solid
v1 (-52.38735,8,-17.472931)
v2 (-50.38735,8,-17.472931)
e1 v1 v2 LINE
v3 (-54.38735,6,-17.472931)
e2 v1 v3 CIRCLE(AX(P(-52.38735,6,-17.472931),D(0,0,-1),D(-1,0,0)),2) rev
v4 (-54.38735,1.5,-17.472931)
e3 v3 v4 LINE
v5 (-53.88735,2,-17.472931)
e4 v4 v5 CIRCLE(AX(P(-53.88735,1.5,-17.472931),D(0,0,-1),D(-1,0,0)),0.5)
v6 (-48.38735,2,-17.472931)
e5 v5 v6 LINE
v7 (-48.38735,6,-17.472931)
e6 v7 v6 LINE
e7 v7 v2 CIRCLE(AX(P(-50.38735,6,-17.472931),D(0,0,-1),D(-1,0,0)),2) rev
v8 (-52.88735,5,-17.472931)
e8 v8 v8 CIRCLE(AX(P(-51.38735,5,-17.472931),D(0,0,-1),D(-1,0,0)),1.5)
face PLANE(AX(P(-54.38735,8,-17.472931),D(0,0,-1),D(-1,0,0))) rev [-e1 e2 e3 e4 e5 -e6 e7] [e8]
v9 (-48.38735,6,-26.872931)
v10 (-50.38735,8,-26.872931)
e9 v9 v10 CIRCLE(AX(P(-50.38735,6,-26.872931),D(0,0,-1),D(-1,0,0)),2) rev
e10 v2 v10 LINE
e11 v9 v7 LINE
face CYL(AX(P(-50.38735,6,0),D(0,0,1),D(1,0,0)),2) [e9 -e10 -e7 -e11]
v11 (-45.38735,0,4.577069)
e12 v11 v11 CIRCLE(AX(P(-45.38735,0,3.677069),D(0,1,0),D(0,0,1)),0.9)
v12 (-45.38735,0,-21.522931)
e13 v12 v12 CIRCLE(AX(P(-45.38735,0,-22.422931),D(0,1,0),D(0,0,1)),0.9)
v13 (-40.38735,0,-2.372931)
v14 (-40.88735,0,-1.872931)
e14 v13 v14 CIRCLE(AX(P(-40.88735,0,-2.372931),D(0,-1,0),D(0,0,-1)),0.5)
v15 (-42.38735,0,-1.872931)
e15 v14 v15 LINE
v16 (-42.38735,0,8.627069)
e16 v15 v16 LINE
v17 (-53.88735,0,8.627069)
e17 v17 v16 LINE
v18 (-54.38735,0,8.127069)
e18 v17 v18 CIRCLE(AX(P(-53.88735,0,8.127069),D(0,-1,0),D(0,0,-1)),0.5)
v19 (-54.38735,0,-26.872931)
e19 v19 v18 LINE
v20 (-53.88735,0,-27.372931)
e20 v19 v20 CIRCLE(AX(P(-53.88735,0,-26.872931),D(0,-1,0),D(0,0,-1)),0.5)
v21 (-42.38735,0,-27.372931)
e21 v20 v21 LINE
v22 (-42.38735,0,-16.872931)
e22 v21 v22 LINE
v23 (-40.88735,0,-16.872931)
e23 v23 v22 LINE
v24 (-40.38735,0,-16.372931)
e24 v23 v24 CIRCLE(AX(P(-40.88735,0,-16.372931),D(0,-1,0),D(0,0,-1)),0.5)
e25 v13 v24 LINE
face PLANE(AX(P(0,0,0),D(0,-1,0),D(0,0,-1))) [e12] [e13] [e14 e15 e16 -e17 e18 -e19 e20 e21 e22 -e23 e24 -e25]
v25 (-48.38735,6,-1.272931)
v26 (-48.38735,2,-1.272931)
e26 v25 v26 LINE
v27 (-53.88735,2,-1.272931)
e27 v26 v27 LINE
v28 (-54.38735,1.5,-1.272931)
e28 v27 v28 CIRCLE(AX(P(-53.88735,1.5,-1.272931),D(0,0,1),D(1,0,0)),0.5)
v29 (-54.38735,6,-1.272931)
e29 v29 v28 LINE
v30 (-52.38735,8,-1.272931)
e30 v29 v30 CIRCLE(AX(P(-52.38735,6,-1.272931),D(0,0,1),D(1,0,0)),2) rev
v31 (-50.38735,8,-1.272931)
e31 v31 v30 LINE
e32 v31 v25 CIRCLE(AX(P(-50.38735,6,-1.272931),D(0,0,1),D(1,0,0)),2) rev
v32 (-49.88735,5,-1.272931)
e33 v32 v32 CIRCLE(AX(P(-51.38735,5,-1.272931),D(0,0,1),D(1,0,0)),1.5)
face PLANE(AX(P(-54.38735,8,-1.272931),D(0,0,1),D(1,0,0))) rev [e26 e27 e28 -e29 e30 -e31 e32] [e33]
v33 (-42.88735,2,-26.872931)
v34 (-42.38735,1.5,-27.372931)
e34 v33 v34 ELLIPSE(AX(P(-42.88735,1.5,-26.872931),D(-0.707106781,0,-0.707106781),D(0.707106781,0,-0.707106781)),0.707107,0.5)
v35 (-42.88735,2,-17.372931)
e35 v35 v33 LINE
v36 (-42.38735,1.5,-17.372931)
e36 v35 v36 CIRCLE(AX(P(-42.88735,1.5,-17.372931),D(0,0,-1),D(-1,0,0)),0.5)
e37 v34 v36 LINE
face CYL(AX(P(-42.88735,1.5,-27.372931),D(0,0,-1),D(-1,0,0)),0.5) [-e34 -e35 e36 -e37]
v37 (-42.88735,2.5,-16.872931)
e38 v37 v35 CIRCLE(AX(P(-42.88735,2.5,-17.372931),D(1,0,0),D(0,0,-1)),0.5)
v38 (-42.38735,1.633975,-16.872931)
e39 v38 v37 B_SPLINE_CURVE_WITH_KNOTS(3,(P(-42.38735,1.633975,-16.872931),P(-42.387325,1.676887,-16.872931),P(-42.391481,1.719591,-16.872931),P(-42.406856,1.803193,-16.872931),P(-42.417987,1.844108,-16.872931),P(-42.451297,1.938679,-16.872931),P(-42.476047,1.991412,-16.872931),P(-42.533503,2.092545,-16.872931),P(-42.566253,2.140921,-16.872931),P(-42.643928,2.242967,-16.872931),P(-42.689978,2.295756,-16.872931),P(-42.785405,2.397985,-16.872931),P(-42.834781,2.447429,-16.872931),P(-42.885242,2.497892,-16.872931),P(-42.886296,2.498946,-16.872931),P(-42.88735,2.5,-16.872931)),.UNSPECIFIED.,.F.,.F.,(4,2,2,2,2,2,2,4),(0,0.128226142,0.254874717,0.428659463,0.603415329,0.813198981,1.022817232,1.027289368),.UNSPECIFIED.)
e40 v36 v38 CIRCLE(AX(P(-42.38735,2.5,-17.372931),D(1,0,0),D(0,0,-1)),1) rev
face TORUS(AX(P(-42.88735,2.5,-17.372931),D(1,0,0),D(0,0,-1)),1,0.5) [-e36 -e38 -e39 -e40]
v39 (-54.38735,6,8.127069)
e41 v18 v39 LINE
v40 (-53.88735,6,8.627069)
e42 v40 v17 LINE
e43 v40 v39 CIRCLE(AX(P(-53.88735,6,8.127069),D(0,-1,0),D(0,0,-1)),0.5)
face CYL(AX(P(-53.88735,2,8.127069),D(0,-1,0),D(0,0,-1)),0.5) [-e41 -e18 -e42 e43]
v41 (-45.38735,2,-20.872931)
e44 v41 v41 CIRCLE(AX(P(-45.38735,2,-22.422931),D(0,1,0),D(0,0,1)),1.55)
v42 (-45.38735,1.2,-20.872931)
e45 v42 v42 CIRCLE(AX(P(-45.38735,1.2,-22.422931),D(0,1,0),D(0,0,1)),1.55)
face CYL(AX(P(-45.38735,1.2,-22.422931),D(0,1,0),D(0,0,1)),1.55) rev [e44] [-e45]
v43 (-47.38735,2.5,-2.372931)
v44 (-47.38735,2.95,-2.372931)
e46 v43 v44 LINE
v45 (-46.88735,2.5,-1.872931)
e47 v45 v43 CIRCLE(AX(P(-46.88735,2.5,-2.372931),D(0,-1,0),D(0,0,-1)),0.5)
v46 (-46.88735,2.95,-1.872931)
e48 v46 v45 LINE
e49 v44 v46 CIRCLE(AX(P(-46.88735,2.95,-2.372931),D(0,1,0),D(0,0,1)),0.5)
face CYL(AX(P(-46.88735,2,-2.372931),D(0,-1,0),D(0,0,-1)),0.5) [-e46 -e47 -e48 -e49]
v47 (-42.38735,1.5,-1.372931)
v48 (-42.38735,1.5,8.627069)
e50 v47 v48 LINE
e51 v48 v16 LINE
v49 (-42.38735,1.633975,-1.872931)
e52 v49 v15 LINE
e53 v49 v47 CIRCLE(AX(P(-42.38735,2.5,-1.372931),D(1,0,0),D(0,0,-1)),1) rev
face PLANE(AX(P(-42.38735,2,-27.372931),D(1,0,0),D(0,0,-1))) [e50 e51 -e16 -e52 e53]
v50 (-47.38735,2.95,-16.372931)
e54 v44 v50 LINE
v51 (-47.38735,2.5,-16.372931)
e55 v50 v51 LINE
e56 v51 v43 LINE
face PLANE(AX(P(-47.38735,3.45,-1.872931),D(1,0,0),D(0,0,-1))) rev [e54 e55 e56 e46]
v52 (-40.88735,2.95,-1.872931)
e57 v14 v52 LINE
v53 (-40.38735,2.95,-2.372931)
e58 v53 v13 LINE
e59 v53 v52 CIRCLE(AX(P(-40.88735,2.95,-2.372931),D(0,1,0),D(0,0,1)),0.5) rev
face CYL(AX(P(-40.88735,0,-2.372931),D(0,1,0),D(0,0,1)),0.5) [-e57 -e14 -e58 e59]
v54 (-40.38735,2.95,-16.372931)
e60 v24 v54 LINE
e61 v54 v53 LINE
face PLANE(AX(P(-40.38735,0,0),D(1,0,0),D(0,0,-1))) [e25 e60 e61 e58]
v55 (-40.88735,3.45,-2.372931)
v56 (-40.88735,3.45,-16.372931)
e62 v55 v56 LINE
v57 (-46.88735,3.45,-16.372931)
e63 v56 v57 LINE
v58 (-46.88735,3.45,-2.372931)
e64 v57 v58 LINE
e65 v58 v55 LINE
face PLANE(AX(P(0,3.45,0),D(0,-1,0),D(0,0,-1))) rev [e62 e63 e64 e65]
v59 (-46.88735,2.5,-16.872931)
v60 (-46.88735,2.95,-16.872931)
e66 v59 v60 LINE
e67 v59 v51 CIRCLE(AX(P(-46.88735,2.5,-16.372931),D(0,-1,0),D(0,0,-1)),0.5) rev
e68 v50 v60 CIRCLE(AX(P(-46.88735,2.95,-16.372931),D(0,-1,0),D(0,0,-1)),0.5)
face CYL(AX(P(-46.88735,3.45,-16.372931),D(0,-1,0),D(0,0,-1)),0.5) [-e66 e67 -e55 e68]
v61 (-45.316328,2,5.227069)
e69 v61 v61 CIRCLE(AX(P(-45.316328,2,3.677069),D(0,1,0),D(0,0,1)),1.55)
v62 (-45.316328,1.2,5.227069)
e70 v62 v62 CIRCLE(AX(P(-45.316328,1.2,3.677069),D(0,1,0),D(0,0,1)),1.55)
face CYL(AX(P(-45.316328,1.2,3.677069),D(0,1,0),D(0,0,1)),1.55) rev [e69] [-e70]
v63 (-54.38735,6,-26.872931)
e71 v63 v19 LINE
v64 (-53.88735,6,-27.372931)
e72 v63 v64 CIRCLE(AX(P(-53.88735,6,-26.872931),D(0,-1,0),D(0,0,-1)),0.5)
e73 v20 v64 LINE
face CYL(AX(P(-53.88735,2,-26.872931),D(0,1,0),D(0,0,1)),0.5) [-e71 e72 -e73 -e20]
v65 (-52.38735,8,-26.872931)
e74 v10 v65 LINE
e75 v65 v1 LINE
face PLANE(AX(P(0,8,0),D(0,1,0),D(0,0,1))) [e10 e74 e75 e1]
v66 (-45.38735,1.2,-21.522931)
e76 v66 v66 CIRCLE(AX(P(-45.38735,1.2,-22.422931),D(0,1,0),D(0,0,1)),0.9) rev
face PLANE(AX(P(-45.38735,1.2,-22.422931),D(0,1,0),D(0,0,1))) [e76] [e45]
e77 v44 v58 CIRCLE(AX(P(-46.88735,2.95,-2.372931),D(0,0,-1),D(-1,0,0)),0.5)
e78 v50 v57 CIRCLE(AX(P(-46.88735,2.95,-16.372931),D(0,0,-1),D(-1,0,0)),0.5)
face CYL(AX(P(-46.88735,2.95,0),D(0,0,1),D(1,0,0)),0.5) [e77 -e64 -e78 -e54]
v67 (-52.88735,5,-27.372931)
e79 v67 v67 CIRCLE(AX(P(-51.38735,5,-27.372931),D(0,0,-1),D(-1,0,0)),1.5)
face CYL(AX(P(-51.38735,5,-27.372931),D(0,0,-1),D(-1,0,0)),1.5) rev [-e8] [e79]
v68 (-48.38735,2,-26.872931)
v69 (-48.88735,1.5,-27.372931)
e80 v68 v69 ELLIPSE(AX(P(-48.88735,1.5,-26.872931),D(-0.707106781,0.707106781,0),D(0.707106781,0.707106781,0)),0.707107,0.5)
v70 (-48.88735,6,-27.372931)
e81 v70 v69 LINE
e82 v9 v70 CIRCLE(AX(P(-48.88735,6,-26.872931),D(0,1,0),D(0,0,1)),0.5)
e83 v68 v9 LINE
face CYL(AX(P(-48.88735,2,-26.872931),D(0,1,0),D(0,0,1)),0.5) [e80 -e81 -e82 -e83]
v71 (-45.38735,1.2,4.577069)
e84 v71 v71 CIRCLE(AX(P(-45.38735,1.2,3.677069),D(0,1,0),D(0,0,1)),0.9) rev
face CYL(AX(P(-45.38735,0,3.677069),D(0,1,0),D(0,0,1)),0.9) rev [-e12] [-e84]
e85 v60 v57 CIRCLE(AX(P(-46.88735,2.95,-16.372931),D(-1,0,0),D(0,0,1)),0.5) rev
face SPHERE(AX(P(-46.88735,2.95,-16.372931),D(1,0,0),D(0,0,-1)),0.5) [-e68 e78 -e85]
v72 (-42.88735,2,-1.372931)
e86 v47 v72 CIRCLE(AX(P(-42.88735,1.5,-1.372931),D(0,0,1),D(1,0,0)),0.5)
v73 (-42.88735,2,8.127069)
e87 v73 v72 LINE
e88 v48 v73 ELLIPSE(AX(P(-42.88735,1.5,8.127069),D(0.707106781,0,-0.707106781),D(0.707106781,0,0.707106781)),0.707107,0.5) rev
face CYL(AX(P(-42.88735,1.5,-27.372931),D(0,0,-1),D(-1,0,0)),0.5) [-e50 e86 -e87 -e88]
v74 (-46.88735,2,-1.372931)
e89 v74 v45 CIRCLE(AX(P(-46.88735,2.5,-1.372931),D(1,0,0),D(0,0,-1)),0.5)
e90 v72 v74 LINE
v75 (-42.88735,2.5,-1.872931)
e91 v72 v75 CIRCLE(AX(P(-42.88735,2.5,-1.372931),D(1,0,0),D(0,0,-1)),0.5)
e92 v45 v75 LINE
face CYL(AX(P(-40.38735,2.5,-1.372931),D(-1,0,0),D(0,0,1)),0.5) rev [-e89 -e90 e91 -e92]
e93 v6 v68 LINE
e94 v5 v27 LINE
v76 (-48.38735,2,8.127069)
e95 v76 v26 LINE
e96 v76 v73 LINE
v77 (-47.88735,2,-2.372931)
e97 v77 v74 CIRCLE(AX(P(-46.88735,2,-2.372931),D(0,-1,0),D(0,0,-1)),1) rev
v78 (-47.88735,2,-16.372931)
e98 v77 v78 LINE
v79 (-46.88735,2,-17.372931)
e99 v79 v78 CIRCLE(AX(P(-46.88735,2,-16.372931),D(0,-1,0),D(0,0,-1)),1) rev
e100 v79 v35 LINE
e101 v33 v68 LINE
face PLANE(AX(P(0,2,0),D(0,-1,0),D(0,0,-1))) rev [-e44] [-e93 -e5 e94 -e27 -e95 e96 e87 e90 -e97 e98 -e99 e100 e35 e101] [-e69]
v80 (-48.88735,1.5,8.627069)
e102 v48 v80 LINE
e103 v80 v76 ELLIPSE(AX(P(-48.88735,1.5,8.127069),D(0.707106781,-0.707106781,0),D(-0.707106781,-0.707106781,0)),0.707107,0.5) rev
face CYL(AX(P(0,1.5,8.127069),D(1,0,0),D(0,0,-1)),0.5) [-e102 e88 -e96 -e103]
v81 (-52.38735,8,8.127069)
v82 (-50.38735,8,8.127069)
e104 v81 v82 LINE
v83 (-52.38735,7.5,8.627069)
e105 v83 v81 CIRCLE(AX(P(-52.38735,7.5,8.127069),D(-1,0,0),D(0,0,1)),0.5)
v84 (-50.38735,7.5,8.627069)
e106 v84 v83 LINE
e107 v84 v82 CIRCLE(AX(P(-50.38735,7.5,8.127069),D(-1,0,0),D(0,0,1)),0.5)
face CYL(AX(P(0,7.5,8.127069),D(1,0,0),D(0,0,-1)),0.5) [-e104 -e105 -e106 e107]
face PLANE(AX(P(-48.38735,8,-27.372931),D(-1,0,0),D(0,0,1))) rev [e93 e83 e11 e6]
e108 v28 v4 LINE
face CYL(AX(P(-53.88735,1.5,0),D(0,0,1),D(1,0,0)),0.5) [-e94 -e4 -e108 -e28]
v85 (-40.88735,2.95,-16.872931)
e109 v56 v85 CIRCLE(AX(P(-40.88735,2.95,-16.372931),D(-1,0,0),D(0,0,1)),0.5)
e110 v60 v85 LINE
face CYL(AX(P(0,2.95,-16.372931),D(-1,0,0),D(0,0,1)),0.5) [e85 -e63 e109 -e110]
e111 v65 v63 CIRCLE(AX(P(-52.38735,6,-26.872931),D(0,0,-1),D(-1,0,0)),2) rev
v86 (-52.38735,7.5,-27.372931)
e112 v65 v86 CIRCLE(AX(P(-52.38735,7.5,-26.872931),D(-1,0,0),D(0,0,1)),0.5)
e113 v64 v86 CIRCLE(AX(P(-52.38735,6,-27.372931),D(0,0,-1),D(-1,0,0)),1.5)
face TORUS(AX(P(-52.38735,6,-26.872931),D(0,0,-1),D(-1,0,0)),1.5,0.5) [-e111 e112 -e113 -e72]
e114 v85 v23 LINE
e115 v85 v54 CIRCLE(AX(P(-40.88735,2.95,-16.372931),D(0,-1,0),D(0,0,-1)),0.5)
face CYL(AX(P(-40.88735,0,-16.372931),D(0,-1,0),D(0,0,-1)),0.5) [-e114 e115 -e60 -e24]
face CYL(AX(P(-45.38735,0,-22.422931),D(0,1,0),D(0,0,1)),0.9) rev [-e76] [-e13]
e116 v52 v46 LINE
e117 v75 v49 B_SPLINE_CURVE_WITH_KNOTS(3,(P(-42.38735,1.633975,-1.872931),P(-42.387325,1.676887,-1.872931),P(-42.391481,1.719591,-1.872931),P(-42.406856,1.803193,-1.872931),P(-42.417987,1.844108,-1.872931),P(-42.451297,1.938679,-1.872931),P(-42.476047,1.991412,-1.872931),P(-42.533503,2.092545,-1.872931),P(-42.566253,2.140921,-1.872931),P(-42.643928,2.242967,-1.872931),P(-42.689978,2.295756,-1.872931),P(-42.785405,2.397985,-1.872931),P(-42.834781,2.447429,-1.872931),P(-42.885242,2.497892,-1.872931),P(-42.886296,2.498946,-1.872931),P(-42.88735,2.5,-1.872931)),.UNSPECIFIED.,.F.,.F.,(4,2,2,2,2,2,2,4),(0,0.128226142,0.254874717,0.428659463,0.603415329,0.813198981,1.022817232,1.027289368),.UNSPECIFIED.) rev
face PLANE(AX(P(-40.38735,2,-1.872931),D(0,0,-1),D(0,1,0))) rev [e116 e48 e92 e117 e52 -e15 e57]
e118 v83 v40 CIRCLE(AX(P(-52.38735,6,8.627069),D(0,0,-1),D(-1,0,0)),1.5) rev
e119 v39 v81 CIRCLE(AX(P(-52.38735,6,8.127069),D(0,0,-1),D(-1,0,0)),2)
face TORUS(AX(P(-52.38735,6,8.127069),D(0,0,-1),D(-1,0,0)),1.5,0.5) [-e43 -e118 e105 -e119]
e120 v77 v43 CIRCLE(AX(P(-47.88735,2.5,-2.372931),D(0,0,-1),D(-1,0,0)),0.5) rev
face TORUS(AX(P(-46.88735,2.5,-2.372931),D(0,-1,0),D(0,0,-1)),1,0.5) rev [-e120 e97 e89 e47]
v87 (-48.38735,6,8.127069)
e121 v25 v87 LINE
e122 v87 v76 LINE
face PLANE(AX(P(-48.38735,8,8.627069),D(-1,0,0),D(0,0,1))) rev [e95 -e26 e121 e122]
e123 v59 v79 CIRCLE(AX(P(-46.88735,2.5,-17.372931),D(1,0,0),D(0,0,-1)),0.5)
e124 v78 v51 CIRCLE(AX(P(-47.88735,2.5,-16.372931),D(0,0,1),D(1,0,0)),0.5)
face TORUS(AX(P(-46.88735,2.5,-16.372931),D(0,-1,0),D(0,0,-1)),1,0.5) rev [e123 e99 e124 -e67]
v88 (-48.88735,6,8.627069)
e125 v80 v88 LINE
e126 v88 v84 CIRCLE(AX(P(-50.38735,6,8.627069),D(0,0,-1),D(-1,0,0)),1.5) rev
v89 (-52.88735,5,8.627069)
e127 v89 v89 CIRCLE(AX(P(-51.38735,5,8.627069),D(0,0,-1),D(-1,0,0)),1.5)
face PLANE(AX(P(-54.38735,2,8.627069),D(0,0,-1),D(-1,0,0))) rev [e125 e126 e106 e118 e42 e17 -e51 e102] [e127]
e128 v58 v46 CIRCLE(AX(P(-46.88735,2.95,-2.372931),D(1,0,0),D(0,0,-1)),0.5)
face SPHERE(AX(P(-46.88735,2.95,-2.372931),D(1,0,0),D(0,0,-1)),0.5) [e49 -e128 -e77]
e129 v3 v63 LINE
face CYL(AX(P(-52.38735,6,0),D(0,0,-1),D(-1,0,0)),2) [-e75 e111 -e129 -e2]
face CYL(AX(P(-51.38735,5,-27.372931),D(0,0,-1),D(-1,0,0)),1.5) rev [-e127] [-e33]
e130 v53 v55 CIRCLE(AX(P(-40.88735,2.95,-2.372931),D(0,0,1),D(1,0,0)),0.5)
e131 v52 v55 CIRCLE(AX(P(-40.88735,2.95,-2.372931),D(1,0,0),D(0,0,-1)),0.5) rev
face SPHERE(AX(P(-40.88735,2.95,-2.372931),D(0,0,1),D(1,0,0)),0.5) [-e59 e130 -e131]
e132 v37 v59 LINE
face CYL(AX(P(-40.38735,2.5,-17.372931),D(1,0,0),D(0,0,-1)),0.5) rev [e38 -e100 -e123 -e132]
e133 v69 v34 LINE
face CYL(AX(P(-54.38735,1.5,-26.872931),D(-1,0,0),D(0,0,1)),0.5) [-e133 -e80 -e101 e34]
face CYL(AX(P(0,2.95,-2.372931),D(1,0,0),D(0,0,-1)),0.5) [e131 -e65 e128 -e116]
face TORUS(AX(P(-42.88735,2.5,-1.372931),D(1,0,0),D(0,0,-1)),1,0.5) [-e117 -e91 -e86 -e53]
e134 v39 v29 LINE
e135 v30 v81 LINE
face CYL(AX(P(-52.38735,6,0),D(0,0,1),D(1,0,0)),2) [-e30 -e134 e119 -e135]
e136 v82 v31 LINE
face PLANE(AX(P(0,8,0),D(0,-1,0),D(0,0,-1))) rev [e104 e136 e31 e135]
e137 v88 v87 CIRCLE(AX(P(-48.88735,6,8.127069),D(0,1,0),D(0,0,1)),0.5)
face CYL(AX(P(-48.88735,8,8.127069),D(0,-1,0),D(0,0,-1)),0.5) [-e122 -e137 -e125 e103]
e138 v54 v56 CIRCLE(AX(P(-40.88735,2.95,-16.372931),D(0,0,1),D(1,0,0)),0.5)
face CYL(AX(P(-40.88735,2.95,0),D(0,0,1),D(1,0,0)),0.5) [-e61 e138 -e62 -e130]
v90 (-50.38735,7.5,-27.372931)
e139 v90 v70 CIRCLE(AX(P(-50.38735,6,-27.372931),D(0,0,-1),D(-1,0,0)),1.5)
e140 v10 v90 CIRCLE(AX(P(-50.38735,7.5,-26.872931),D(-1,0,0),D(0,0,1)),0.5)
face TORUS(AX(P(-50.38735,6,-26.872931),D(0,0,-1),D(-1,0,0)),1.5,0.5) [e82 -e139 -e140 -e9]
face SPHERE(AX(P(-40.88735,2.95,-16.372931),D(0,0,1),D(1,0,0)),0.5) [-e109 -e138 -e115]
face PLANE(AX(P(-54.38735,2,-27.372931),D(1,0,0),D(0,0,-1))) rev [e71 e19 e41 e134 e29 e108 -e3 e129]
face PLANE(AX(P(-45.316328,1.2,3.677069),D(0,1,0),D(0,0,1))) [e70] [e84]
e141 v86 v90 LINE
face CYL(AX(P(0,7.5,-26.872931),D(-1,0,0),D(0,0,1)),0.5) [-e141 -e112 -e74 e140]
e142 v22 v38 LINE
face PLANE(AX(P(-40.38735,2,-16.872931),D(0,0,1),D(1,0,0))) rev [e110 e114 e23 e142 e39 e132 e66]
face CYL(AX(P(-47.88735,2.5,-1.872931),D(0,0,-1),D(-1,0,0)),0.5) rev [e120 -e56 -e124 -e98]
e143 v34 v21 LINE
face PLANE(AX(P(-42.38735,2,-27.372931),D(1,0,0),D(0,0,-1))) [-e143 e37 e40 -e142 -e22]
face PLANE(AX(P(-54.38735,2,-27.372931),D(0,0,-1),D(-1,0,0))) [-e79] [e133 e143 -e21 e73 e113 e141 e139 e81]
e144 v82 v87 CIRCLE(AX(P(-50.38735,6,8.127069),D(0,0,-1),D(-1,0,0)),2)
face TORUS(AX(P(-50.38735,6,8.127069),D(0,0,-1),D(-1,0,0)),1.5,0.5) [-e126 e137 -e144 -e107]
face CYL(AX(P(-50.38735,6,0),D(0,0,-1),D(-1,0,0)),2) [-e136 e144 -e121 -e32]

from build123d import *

# Parameters (mm, degrees)
SKETCH2_W             = 12
SKETCH2_H             = 36
BOSS_EXTRUDE1_DEPTH   = 2
SKETCH3_W             = 6
SKETCH3_H             = 9.9
BOSS_EXTRUDE2_DEPTH   = 6
F_3_0MM_DOWEL_HOLE1_D = 3
FILLET1_R             = 2
SKETCH10_W            = 15
SKETCH10_H            = 2
BOSS_EXTRUDE3_DEPTH   = 2
SKETCH11_W            = 7
SKETCH11_H            = 15
BOSS_EXTRUDE4_DEPTH   = 1.45
FILLET2_R             = 0.5
FILLET5_R             = 0.5
FILLET6_R             = 0.5
SKETCH7_R             = 0.9
CUT_EXTRUDE5_DEPTH    = 62.182196999
SKETCH19_R            = 1.55
CUT_EXTRUDE6_DEPTH    = 0.8
FILLET7_R             = 0.5


with BuildPart() as part:
    # Sketch2 → Boss-Extrude1 (new body)
    with BuildSketch(Plane(origin=(0, 0, 0), x_dir=(1, 0, 0), z_dir=(0, 1, 0))):
        with Locations((-48.387350108, 9.372931481)):
            Rectangle(SKETCH2_W, SKETCH2_H)
    extrude(amount=BOSS_EXTRUDE1_DEPTH)

    # Sketch3 → Boss-Extrude2 (add)
    with BuildSketch(Plane(origin=(0, 2, 0), x_dir=(1, 0, 0), z_dir=(0, 1, 0))):
        with Locations((-51.387350108, -3.677068519)):
            Rectangle(SKETCH3_W, SKETCH3_H)
        with Locations((-51.387350108, 22.422931481)):
            Rectangle(SKETCH3_W, SKETCH3_H)
    extrude(amount=BOSS_EXTRUDE2_DEPTH)

    # Ø3.0mm Dowel Hole1 (through all)
    with Locations(Plane(origin=(0, 0, -27.372931481), x_dir=(-1, 0, 0), z_dir=(0, 0, -1))):
        with Locations((51.387350108, 5)):
            Hole(F_3_0MM_DOWEL_HOLE1_D / 2)

    # Fillet1
    fillet1_edges = [part.edges().sort_by_distance(p)[0] for p in [
        (-54.387350108, 8, 3.677068519),
        (-48.387350108, 8, 3.677068519),
        (-54.387350108, 8, -22.422931481),
        (-48.387350108, 8, -22.422931481),
    ]]
    fillet(fillet1_edges, radius=FILLET1_R)

    # Sketch10 → Boss-Extrude3 (add)
    with BuildSketch(Plane(origin=(-42.387350108, 0, 0), x_dir=(0, 0, -1), z_dir=(1, 0, 0))):
        with Locations((9.372931481, 1)):
            Rectangle(SKETCH10_W, SKETCH10_H)
    extrude(amount=BOSS_EXTRUDE3_DEPTH)

    # Sketch11 → Boss-Extrude4 (add)
    with BuildSketch(Plane(origin=(0, 2, 0), x_dir=(1, 0, 0), z_dir=(0, 1, 0))):
        with Locations((-43.887350108, 9.372931481)):
            Rectangle(SKETCH11_W, SKETCH11_H)
    extrude(amount=BOSS_EXTRUDE4_DEPTH)

    # Fillet2
    fillet2_edges = [part.edges().sort_by_distance(p)[0] for p in [
        (-40.387350108, 1.725, -1.872931481),
        (-40.387350108, 1.725, -16.872931481),
        (-43.887350108, 3.45, -16.872931481),
        (-43.887350108, 3.45, -1.872931481),
    ]]
    fillet(fillet2_edges, radius=FILLET2_R)

    # Fillet5
    # the kernel refuses this fillet: 0.5 mm, written as the material it takes off along each edge
    with BuildSketch(Plane(origin=(-40.887350108, 2.95, -16.372931481), x_dir=(0, 1, 0), z_dir=(1, 0, 0))) as fillet5_piece_1_section:
        Polygon((0, 0), (FILLET5_R, 0), (FILLET5_R, -FILLET5_R), (0, -FILLET5_R), align=None)
    fillet5_piece_1 = extrude(amount=FILLET5_R, mode=Mode.PRIVATE)
    fillet5_piece_1 = fillet5_piece_1 - Plane(origin=(-40.887350108, 2.95, -16.372931481), x_dir=(0, -0.7071067811865475, 0.7071067811865475), z_dir=(1, 0, 0)) * Sphere(FILLET5_R, mode=Mode.PRIVATE)
    add(fillet5_piece_1, mode=Mode.SUBTRACT)
    with BuildSketch(Plane(origin=(-40.887350108, 2.95, -2.372931481), x_dir=(0, 1, 0), z_dir=(1, 0, 0))) as fillet5_piece_2_section:
        Polygon((0, 0), (FILLET5_R, 0), (FILLET5_R, FILLET5_R), (0, FILLET5_R), align=None)
    fillet5_piece_2 = extrude(amount=FILLET5_R, mode=Mode.PRIVATE)
    fillet5_piece_2 = fillet5_piece_2 - Plane(origin=(-40.887350108, 2.95, -2.372931481), x_dir=(0, -0.7071067811865477, -0.7071067811865474), z_dir=(1, 0, 0)) * Sphere(FILLET5_R, mode=Mode.PRIVATE)
    add(fillet5_piece_2, mode=Mode.SUBTRACT)
    with BuildSketch(Plane(origin=(-40.387350108, 3.45, -16.372931481), x_dir=(0, -1, 0), z_dir=(0, 0, 1))) as fillet5_piece_3:
        with BuildLine():
            CenterArc((FILLET5_R, -FILLET5_R), FILLET5_R, 90, 90)
            Line((0, -FILLET5_R), (0, 0))
            Line((0, 0), (FILLET5_R, 0))
        make_face()
    extrude(amount=14, mode=Mode.SUBTRACT)

    # Fillet6
    fillet6_edges = [part.edges().sort_by_distance(p)[0] for p in [
        (-47.387350108, 2.475, -16.872931481),
        (-47.387350108, 2.475, -1.872931481),
        (-47.387350108, 3.45, -9.372931481),
        (-47.387350108, 3.303553391, -2.01937809),
        (-47.387350108, 3.303553391, -16.726484871),
        (-44.887350108, 2, -16.872931481),
        (-47.387350108, 2, -9.372931481),
        (-44.887350108, 2, -1.872931481),
    ]]
    fillet(fillet6_edges, radius=FILLET6_R)

    # Sketch7 → Cut-Extrude5 (cut, through all)
    with BuildSketch(Plane(origin=(0, 2, 0), x_dir=(1, 0, 0), z_dir=(0, 1, 0))):
        with Locations(Location((-45.387350108, -3.677068519, 0), (0, 0, 270))):
            Circle(SKETCH7_R)
        with Locations(Location((-45.387350108, 22.422931481, 0), (0, 0, 270))):
            Circle(SKETCH7_R)
    extrude(amount=-CUT_EXTRUDE5_DEPTH, mode=Mode.SUBTRACT)

    # Sketch19 → Cut-Extrude6 (cut)
    with BuildSketch(Plane(origin=(0, 2, 0), x_dir=(1, 0, 0), z_dir=(0, 1, 0))):
        with Locations(Location((-45.316328349, -3.677068519, 0), (0, 0, 270))):
            Circle(SKETCH19_R)
        with Locations(Location((-45.387350108, 22.422931481, 0), (0, 0, 270))):
            Circle(SKETCH19_R)
    extrude(amount=-CUT_EXTRUDE6_DEPTH, mode=Mode.SUBTRACT)

    # Fillet7
    # the kernel refuses this fillet: 0.5 mm, written as the material it takes off along each edge
    with BuildSketch(Plane(origin=(-42.387350108, 2, -1.372931481), x_dir=(0, -1, 0), z_dir=(0, 0, 1)), Plane(origin=(-42.387350108, 2, -28.622931481), x_dir=(0, -1, 0), z_dir=(0, 0, 1))) as fillet7_piece_1:
        with BuildLine():
            CenterArc((FILLET7_R, -FILLET7_R), FILLET7_R, 90, 90)
            Line((0, -FILLET7_R), (0, 0))
            Line((0, 0), (FILLET7_R, 0))
        make_face()
    extrude(amount=11.25, mode=Mode.SUBTRACT)
    with BuildSketch(Plane(origin=(-41.137350108, 2, 8.627068519), x_dir=(0, -1, 0), z_dir=(-1, 0, 0)), Plane(origin=(-48.387350108, 2, -27.372931481), x_dir=(0, -1, 0), z_dir=(1, 0, 0)), Plane(origin=(-54.387350108, -1.25, 8.627068519), x_dir=(0, 0, -1), z_dir=(0, 1, 0)), Plane(origin=(-54.387350108, -1.25, -27.372931481), x_dir=(1, 0, 0), z_dir=(0, 1, 0))) as fillet7_piece_2:
        with BuildLine():
            CenterArc((FILLET7_R, -FILLET7_R), FILLET7_R, 90, 90)
            Line((0, -FILLET7_R), (0, 0))
            Line((0, 0), (FILLET7_R, 0))
        make_face()
    extrude(amount=7.25, mode=Mode.SUBTRACT)
    with BuildSketch(Plane(origin=(-42.387350108, 2.5, -17.372931481), x_dir=(0, 0.5976672776328271, -0.8017442392976486), z_dir=(0, -0.8017442392976486, -0.5976672776328271))) as fillet7_piece_3_section:
        with BuildLine():
            CenterArc((0.5 + FILLET7_R, -FILLET7_R), FILLET7_R, 90, 90)
            Line((0.5, -FILLET7_R), (0.5, 0))
            Line((0.5, 0), (0.5 + FILLET7_R, 0))
        make_face()
    fillet7_piece_3 = revolve(axis=Axis((-42.387350108, 2.5, -17.372931481), (1, 0, 0)), revolution_arc=233.296989237, mode=Mode.PRIVATE)
    fillet7_piece_3 = split(fillet7_piece_3, bisect_by=Plane(origin=(-42.387350108, 2.5, -16.872931481), z_dir=(0, 0, -1)), keep=Keep.TOP, mode=Mode.PRIVATE)
    add(fillet7_piece_3, mode=Mode.SUBTRACT)
    with BuildSketch(Plane(origin=(-42.387350108, 2.5, -1.372931481), x_dir=(0, -1, 0), z_dir=(0, 0, 1))) as fillet7_piece_4_section:
        with BuildLine():
            CenterArc((0.5 + FILLET7_R, -FILLET7_R), FILLET7_R, 90, 90)
            Line((0.5, -FILLET7_R), (0.5, 0))
            Line((0.5, 0), (0.5 + FILLET7_R, 0))
        make_face()
    fillet7_piece_4 = revolve(axis=Axis((-42.387350108, 2.5, -1.372931481), (1, 0, 0)), revolution_arc=233.296989237, mode=Mode.PRIVATE)
    fillet7_piece_4 = split(fillet7_piece_4, bisect_by=Plane(origin=(-42.387350108, 2.5, -1.872931481), z_dir=(0, 0, 1)), keep=Keep.TOP, mode=Mode.PRIVATE)
    add(fillet7_piece_4, mode=Mode.SUBTRACT)
    with BuildSketch(Plane(origin=(-54.387350108, 2, -1.272931481), x_dir=(0, -1, 0), z_dir=(0, 0, -1))) as fillet7_piece_5:
        with BuildLine():
            CenterArc((FILLET7_R, -FILLET7_R), FILLET7_R, 90, 90)
            Line((0, -FILLET7_R), (0, 0))
            Line((0, 0), (FILLET7_R, 0))
        make_face()
    extrude(amount=16.2, mode=Mode.SUBTRACT)
    with BuildSketch(Plane(origin=(-52.387350108, 8, -27.372931481), x_dir=(0, -1, 0), z_dir=(1, 0, 0))) as fillet7_piece_6:
        with BuildLine():
            CenterArc((FILLET7_R, -FILLET7_R), FILLET7_R, 90, 90)
            Line((0, -FILLET7_R), (0, 0))
            Line((0, 0), (FILLET7_R, 0))
        make_face()
    extrude(amount=2, mode=Mode.SUBTRACT)
    with BuildSketch(Plane(origin=(-48.387350108, 2, -27.372931481), x_dir=(-1, 0, 0), z_dir=(0, 1, 0))) as fillet7_piece_7:
        with BuildLine():
            CenterArc((FILLET7_R, FILLET7_R), FILLET7_R, 180, 90)
            Line((0, FILLET7_R), (0, 0))
            Line((0, 0), (FILLET7_R, 0))
        make_face()
    extrude(amount=4, mode=Mode.SUBTRACT)
    with BuildSketch(Plane(origin=(-50.387350108, 6, -27.372931481), x_dir=(0, 1, 0), z_dir=(-1, 0, 0))) as fillet7_piece_8:
        with BuildLine():
            CenterArc((2 - FILLET7_R, -FILLET7_R), FILLET7_R, 0, 90)
            Line((2, -FILLET7_R), (2, 0))
            Line((2, 0), (2 - FILLET7_R, 0))
        make_face()
    revolve(axis=Axis((-50.387350108, 6, -27.372931481), (0, 0, -1)), revolution_arc=90, mode=Mode.SUBTRACT)
    with BuildSketch(Plane(origin=(-52.387350108, 6, -27.372931481), x_dir=(-1, 0, 0), z_dir=(0, -1, 0))) as fillet7_piece_9:
        with BuildLine():
            CenterArc((2 - FILLET7_R, -FILLET7_R), FILLET7_R, 0, 90)
            Line((2, -FILLET7_R), (2, 0))
            Line((2, 0), (2 - FILLET7_R, 0))
        make_face()
    revolve(axis=Axis((-52.387350108, 6, -27.372931481), (0, 0, -1)), revolution_arc=90, mode=Mode.SUBTRACT)
    with BuildSketch(Plane(origin=(-52.387350108, 8, 8.627068519), x_dir=(0, -1, 0), z_dir=(1, 0, 0))) as fillet7_piece_10:
        with BuildLine():
            CenterArc((FILLET7_R, FILLET7_R), FILLET7_R, 180, 90)
            Line((0, FILLET7_R), (0, 0))
            Line((0, 0), (FILLET7_R, 0))
        make_face()
    extrude(amount=2, mode=Mode.SUBTRACT)
    with BuildSketch(Plane(origin=(-48.387350108, 2, 8.627068519), x_dir=(-1, 0, 0), z_dir=(0, 1, 0))) as fillet7_piece_11:
        with BuildLine():
            CenterArc((FILLET7_R, -FILLET7_R), FILLET7_R, 90, 90)
            Line((0, -FILLET7_R), (0, 0))
            Line((0, 0), (FILLET7_R, 0))
        make_face()
    extrude(amount=4, mode=Mode.SUBTRACT)
    with BuildSketch(Plane(origin=(-50.387350108, 6, 8.627068519), x_dir=(0, 1, 0), z_dir=(-1, 0, 0))) as fillet7_piece_12:
        with BuildLine():
            CenterArc((2 - FILLET7_R, FILLET7_R), FILLET7_R, 270, 90)
            Line((2, FILLET7_R), (2, 0))
            Line((2, 0), (2 - FILLET7_R, 0))
        make_face()
    revolve(axis=Axis((-50.387350108, 6, 8.627068519), (0, 0, -1)), revolution_arc=90, mode=Mode.SUBTRACT)
    with BuildSketch(Plane(origin=(-52.387350108, 6, 8.627068519), x_dir=(-1, 0, 0), z_dir=(0, -1, 0))) as fillet7_piece_13:
        with BuildLine():
            CenterArc((2 - FILLET7_R, FILLET7_R), FILLET7_R, 270, 90)
            Line((2, FILLET7_R), (2, 0))
            Line((2, 0), (2 - FILLET7_R, 0))
        make_face()
    revolve(axis=Axis((-52.387350108, 6, 8.627068519), (0, 0, -1)), revolution_arc=90, mode=Mode.SUBTRACT)
    with BuildSketch(Plane(origin=(-42.387350108, 2, 8.627068519), x_dir=(0, -1, 0), z_dir=(-1, 0, 0))) as fillet7_piece_14a_section:
        with BuildLine():
            CenterArc((FILLET7_R, -FILLET7_R), FILLET7_R, 90, 90)
            Line((0, -FILLET7_R), (0, 0))
            Line((0, 0), (FILLET7_R, 0))
        make_face()
    fillet7_piece_14a = extrude(amount=7.25, mode=Mode.PRIVATE)
    fillet7_piece_14a = split(fillet7_piece_14a, bisect_by=Plane(origin=(-48.387350108, 2, 8.627068519), z_dir=(-1, 0, 0)), keep=Keep.TOP, mode=Mode.PRIVATE)
    with BuildSketch(Plane(origin=(-48.387350108, 0.75, 8.627068519), x_dir=(-1, 0, 0), z_dir=(0, 1, 0))) as fillet7_piece_14b_section:
        with BuildLine():
            CenterArc((FILLET7_R, -FILLET7_R), FILLET7_R, 90, 90)
            Line((0, -FILLET7_R), (0, 0))
            Line((0, 0), (FILLET7_R, 0))
        make_face()
    fillet7_piece_14b = extrude(amount=5.25, mode=Mode.PRIVATE)
    fillet7_piece_14b = split(fillet7_piece_14b, bisect_by=Plane(origin=(-48.387350108, 2, 8.627068519), z_dir=(0, -1, 0)), keep=Keep.TOP, mode=Mode.PRIVATE)
    fillet7_piece_14 = fillet7_piece_14a & fillet7_piece_14b
    add(fillet7_piece_14, mode=Mode.SUBTRACT)
    with BuildSketch(Plane(origin=(-49.637350108, 2, -27.372931481), x_dir=(0, -1, 0), z_dir=(1, 0, 0))) as fillet7_piece_15a_section:
        with BuildLine():
            CenterArc((FILLET7_R, -FILLET7_R), FILLET7_R, 90, 90)
            Line((0, -FILLET7_R), (0, 0))
            Line((0, 0), (FILLET7_R, 0))
        make_face()
    fillet7_piece_15a = extrude(amount=7.25, mode=Mode.PRIVATE)
    fillet7_piece_15a = split(fillet7_piece_15a, bisect_by=Plane(origin=(-48.387350108, 2, -27.372931481), z_dir=(-1, 0, 0)), keep=Keep.TOP, mode=Mode.PRIVATE)
    with BuildSketch(Plane(origin=(-48.387350108, 0.75, -27.372931481), x_dir=(-1, 0, 0), z_dir=(0, 1, 0))) as fillet7_piece_15b_section:
        with BuildLine():
            CenterArc((FILLET7_R, FILLET7_R), FILLET7_R, 180, 90)
            Line((0, FILLET7_R), (0, 0))
            Line((0, 0), (FILLET7_R, 0))
        make_face()
    fillet7_piece_15b = extrude(amount=5.25, mode=Mode.PRIVATE)
    fillet7_piece_15b = split(fillet7_piece_15b, bisect_by=Plane(origin=(-48.387350108, 2, -27.372931481), z_dir=(0, -1, 0)), keep=Keep.TOP, mode=Mode.PRIVATE)
    fillet7_piece_15 = fillet7_piece_15a & fillet7_piece_15b
    add(fillet7_piece_15, mode=Mode.SUBTRACT)


solid = part.part
